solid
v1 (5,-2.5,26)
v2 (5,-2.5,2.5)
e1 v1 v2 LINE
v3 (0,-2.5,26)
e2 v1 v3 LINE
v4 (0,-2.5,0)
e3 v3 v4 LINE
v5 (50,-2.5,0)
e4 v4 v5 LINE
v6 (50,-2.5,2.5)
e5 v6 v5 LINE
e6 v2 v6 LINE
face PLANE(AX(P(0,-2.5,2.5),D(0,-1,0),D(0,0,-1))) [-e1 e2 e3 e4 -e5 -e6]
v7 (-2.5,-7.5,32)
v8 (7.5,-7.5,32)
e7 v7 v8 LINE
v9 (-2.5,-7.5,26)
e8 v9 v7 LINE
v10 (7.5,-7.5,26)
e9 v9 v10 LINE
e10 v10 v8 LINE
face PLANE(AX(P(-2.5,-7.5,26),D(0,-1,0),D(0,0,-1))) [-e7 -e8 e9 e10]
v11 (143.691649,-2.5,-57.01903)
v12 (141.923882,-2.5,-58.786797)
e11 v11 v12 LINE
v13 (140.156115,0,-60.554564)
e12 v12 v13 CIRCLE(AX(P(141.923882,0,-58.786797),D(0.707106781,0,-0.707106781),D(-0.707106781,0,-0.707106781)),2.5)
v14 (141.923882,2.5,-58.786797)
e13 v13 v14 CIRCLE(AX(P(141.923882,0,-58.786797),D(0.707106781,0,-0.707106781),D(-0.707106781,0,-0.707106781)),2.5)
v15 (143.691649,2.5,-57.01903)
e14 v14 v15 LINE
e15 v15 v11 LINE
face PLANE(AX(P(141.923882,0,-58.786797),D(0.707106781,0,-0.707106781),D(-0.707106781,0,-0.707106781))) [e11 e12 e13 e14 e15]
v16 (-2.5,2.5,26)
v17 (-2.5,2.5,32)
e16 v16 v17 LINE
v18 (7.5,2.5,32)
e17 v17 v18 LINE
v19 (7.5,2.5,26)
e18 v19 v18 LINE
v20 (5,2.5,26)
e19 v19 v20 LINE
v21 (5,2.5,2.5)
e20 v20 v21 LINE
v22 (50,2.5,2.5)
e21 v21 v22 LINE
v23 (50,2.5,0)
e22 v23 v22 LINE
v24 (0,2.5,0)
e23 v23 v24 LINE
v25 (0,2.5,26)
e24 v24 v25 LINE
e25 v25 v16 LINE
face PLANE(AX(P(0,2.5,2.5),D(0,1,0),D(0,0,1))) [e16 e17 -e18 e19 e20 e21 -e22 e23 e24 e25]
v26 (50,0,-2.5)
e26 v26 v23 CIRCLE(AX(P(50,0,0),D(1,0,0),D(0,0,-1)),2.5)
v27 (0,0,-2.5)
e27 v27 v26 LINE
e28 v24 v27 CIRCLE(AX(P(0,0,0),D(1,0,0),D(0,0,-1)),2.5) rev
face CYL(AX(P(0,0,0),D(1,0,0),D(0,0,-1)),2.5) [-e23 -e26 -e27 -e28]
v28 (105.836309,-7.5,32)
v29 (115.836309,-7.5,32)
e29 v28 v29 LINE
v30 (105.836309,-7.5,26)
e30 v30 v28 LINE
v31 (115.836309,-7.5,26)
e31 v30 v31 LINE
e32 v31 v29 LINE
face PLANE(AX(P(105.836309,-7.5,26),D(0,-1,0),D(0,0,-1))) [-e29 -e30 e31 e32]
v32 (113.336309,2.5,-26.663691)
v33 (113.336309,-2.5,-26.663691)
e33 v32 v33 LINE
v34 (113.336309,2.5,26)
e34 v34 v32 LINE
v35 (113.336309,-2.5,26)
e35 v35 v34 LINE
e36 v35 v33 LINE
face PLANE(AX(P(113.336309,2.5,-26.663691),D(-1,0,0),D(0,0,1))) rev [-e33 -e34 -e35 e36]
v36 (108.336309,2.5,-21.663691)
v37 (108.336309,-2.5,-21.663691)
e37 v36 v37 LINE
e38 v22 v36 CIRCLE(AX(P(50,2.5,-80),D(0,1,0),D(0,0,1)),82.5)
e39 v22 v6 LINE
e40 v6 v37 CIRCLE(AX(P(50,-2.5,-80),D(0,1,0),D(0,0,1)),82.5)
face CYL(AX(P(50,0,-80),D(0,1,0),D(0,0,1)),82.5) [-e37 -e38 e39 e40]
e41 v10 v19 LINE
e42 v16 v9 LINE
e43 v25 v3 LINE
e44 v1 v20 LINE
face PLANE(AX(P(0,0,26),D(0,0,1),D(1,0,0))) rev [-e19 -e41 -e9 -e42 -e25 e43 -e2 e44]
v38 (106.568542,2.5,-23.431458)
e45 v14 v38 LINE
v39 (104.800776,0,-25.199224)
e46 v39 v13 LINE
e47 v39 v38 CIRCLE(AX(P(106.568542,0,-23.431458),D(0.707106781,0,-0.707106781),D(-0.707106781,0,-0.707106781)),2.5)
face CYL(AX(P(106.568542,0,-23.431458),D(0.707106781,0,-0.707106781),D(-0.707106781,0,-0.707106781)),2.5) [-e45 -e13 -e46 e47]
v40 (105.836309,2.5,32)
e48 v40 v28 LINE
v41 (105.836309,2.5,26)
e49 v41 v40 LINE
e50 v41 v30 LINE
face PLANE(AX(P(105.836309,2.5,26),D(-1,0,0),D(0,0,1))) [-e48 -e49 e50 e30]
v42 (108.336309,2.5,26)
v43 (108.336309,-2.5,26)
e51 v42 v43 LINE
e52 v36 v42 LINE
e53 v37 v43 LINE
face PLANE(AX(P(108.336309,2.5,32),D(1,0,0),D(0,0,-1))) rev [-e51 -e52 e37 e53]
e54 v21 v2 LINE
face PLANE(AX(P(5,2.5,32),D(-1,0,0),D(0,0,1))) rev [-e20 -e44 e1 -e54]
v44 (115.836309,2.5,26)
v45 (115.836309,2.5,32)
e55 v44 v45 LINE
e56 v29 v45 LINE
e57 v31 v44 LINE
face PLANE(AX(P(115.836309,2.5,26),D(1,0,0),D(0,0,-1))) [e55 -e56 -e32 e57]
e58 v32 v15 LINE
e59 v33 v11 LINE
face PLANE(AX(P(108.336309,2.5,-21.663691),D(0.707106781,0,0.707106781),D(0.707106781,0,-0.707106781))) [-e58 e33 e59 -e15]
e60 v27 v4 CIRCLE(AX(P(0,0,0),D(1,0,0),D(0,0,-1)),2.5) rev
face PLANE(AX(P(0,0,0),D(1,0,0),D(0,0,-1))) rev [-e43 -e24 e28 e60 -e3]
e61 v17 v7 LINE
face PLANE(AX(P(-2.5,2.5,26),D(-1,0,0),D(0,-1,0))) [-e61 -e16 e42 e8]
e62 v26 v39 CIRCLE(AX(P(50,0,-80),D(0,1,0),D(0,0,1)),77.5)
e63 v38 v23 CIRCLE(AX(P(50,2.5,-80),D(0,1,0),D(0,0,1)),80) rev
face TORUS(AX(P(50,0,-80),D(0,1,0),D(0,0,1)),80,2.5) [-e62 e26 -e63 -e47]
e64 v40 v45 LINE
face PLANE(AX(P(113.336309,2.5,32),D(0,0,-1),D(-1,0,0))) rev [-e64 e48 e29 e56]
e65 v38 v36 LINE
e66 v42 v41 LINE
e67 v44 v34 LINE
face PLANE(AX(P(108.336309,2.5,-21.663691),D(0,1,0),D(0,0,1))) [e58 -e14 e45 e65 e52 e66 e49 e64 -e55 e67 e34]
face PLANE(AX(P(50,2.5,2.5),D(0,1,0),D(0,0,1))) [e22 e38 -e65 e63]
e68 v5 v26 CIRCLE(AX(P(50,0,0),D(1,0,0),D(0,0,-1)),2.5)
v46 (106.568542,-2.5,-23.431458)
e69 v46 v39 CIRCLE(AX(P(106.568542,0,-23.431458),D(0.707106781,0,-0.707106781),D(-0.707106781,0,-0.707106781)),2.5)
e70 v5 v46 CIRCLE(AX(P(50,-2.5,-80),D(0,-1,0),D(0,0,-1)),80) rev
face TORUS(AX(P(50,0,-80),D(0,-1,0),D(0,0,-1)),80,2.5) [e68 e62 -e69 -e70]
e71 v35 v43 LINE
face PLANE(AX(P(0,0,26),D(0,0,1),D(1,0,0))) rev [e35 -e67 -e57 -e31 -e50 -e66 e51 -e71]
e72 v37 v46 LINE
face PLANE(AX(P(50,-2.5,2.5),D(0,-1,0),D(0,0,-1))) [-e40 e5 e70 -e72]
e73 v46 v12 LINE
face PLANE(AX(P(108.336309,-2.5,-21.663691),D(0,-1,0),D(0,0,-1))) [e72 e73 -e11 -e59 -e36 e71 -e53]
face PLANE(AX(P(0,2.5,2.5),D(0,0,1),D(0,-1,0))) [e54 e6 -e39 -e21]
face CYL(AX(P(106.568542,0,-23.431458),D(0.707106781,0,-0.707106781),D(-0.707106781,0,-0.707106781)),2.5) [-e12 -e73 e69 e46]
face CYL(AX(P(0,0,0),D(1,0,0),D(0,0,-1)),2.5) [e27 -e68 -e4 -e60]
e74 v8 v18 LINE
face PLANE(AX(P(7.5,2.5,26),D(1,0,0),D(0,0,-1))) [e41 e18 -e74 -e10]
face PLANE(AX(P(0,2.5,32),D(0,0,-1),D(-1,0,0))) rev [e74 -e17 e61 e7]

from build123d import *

# Parameters (mm, degrees)
SKETCH2_W           = 5
SKETCH2_H           = 5
FILLET1_R           = 2.5
SKETCH3_W           = 5
SKETCH3_H           = 29.5
BOSS_EXTRUDE1_DEPTH = 2.5
SKETCH4_W           = 10
SKETCH4_H           = 10
BOSS_EXTRUDE2_DEPTH = 6


with BuildPart() as part:
    # Sweep3: sweep along a path in Sketch1
    with BuildLine(Plane(origin=(0, 0, 0), x_dir=(1, 0, 0), z_dir=(0, 1, 0))) as sweep3_path:
        Line((0, 0), (50, 0))
        ThreePointArc((50, 0), (80.614674589, 6.089637399), (106.568542495, 23.431457505))
        Line((106.568542495, 23.431457505), (141.923881554, 58.786796564))
    # Sketch2 → Sweep3 (sweep)
    with BuildSketch(Plane(origin=(0, 0, 0), x_dir=(0, 0, -1), z_dir=(1, 0, 0))):
        Rectangle(SKETCH2_W, SKETCH2_H)
    sweep(path=sweep3_path.line)

    # Fillet1
    fillet1_edges = [part.edges().sort_by_distance(p)[0] for p in [
        (122.478445072, -2.5, -42.876893988),
        (79.657966008, -2.5, -8.39933623),
        (122.478445072, 2.5, -42.876893988),
        (79.657966008, 2.5, -8.39933623),
        (25, -2.5, -2.5),
        (25, 2.5, -2.5),
    ]]
    fillet(fillet1_edges, radius=FILLET1_R - 0.0001)  # a hair under: the kernel refuses the full size

    # Sketch3 → Boss-Extrude1 (add, symmetric)
    with BuildSketch(Plane(origin=(0, 0, 0), x_dir=(1, 0, 0), z_dir=(0, 1, 0))):
        with Locations((2.5, -17.25)):
            Rectangle(SKETCH3_W, SKETCH3_H)
        Polygon((108.336309448, 21.663690552), (113.336309448, 26.663690552), (113.336309448, -32), (108.336309448, -32), align=None)
    extrude(amount=BOSS_EXTRUDE1_DEPTH, both=True)

    # Sketch4 → Boss-Extrude2 (add)
    with BuildSketch(Plane.XY.offset(32)):
        with Locations((2.5, -2.5)):
            Rectangle(SKETCH4_W, SKETCH4_H)
        with Locations((110.836309448, -2.5)):
            Rectangle(SKETCH4_W, SKETCH4_H)
    extrude(amount=-BOSS_EXTRUDE2_DEPTH)


solid = part.part
